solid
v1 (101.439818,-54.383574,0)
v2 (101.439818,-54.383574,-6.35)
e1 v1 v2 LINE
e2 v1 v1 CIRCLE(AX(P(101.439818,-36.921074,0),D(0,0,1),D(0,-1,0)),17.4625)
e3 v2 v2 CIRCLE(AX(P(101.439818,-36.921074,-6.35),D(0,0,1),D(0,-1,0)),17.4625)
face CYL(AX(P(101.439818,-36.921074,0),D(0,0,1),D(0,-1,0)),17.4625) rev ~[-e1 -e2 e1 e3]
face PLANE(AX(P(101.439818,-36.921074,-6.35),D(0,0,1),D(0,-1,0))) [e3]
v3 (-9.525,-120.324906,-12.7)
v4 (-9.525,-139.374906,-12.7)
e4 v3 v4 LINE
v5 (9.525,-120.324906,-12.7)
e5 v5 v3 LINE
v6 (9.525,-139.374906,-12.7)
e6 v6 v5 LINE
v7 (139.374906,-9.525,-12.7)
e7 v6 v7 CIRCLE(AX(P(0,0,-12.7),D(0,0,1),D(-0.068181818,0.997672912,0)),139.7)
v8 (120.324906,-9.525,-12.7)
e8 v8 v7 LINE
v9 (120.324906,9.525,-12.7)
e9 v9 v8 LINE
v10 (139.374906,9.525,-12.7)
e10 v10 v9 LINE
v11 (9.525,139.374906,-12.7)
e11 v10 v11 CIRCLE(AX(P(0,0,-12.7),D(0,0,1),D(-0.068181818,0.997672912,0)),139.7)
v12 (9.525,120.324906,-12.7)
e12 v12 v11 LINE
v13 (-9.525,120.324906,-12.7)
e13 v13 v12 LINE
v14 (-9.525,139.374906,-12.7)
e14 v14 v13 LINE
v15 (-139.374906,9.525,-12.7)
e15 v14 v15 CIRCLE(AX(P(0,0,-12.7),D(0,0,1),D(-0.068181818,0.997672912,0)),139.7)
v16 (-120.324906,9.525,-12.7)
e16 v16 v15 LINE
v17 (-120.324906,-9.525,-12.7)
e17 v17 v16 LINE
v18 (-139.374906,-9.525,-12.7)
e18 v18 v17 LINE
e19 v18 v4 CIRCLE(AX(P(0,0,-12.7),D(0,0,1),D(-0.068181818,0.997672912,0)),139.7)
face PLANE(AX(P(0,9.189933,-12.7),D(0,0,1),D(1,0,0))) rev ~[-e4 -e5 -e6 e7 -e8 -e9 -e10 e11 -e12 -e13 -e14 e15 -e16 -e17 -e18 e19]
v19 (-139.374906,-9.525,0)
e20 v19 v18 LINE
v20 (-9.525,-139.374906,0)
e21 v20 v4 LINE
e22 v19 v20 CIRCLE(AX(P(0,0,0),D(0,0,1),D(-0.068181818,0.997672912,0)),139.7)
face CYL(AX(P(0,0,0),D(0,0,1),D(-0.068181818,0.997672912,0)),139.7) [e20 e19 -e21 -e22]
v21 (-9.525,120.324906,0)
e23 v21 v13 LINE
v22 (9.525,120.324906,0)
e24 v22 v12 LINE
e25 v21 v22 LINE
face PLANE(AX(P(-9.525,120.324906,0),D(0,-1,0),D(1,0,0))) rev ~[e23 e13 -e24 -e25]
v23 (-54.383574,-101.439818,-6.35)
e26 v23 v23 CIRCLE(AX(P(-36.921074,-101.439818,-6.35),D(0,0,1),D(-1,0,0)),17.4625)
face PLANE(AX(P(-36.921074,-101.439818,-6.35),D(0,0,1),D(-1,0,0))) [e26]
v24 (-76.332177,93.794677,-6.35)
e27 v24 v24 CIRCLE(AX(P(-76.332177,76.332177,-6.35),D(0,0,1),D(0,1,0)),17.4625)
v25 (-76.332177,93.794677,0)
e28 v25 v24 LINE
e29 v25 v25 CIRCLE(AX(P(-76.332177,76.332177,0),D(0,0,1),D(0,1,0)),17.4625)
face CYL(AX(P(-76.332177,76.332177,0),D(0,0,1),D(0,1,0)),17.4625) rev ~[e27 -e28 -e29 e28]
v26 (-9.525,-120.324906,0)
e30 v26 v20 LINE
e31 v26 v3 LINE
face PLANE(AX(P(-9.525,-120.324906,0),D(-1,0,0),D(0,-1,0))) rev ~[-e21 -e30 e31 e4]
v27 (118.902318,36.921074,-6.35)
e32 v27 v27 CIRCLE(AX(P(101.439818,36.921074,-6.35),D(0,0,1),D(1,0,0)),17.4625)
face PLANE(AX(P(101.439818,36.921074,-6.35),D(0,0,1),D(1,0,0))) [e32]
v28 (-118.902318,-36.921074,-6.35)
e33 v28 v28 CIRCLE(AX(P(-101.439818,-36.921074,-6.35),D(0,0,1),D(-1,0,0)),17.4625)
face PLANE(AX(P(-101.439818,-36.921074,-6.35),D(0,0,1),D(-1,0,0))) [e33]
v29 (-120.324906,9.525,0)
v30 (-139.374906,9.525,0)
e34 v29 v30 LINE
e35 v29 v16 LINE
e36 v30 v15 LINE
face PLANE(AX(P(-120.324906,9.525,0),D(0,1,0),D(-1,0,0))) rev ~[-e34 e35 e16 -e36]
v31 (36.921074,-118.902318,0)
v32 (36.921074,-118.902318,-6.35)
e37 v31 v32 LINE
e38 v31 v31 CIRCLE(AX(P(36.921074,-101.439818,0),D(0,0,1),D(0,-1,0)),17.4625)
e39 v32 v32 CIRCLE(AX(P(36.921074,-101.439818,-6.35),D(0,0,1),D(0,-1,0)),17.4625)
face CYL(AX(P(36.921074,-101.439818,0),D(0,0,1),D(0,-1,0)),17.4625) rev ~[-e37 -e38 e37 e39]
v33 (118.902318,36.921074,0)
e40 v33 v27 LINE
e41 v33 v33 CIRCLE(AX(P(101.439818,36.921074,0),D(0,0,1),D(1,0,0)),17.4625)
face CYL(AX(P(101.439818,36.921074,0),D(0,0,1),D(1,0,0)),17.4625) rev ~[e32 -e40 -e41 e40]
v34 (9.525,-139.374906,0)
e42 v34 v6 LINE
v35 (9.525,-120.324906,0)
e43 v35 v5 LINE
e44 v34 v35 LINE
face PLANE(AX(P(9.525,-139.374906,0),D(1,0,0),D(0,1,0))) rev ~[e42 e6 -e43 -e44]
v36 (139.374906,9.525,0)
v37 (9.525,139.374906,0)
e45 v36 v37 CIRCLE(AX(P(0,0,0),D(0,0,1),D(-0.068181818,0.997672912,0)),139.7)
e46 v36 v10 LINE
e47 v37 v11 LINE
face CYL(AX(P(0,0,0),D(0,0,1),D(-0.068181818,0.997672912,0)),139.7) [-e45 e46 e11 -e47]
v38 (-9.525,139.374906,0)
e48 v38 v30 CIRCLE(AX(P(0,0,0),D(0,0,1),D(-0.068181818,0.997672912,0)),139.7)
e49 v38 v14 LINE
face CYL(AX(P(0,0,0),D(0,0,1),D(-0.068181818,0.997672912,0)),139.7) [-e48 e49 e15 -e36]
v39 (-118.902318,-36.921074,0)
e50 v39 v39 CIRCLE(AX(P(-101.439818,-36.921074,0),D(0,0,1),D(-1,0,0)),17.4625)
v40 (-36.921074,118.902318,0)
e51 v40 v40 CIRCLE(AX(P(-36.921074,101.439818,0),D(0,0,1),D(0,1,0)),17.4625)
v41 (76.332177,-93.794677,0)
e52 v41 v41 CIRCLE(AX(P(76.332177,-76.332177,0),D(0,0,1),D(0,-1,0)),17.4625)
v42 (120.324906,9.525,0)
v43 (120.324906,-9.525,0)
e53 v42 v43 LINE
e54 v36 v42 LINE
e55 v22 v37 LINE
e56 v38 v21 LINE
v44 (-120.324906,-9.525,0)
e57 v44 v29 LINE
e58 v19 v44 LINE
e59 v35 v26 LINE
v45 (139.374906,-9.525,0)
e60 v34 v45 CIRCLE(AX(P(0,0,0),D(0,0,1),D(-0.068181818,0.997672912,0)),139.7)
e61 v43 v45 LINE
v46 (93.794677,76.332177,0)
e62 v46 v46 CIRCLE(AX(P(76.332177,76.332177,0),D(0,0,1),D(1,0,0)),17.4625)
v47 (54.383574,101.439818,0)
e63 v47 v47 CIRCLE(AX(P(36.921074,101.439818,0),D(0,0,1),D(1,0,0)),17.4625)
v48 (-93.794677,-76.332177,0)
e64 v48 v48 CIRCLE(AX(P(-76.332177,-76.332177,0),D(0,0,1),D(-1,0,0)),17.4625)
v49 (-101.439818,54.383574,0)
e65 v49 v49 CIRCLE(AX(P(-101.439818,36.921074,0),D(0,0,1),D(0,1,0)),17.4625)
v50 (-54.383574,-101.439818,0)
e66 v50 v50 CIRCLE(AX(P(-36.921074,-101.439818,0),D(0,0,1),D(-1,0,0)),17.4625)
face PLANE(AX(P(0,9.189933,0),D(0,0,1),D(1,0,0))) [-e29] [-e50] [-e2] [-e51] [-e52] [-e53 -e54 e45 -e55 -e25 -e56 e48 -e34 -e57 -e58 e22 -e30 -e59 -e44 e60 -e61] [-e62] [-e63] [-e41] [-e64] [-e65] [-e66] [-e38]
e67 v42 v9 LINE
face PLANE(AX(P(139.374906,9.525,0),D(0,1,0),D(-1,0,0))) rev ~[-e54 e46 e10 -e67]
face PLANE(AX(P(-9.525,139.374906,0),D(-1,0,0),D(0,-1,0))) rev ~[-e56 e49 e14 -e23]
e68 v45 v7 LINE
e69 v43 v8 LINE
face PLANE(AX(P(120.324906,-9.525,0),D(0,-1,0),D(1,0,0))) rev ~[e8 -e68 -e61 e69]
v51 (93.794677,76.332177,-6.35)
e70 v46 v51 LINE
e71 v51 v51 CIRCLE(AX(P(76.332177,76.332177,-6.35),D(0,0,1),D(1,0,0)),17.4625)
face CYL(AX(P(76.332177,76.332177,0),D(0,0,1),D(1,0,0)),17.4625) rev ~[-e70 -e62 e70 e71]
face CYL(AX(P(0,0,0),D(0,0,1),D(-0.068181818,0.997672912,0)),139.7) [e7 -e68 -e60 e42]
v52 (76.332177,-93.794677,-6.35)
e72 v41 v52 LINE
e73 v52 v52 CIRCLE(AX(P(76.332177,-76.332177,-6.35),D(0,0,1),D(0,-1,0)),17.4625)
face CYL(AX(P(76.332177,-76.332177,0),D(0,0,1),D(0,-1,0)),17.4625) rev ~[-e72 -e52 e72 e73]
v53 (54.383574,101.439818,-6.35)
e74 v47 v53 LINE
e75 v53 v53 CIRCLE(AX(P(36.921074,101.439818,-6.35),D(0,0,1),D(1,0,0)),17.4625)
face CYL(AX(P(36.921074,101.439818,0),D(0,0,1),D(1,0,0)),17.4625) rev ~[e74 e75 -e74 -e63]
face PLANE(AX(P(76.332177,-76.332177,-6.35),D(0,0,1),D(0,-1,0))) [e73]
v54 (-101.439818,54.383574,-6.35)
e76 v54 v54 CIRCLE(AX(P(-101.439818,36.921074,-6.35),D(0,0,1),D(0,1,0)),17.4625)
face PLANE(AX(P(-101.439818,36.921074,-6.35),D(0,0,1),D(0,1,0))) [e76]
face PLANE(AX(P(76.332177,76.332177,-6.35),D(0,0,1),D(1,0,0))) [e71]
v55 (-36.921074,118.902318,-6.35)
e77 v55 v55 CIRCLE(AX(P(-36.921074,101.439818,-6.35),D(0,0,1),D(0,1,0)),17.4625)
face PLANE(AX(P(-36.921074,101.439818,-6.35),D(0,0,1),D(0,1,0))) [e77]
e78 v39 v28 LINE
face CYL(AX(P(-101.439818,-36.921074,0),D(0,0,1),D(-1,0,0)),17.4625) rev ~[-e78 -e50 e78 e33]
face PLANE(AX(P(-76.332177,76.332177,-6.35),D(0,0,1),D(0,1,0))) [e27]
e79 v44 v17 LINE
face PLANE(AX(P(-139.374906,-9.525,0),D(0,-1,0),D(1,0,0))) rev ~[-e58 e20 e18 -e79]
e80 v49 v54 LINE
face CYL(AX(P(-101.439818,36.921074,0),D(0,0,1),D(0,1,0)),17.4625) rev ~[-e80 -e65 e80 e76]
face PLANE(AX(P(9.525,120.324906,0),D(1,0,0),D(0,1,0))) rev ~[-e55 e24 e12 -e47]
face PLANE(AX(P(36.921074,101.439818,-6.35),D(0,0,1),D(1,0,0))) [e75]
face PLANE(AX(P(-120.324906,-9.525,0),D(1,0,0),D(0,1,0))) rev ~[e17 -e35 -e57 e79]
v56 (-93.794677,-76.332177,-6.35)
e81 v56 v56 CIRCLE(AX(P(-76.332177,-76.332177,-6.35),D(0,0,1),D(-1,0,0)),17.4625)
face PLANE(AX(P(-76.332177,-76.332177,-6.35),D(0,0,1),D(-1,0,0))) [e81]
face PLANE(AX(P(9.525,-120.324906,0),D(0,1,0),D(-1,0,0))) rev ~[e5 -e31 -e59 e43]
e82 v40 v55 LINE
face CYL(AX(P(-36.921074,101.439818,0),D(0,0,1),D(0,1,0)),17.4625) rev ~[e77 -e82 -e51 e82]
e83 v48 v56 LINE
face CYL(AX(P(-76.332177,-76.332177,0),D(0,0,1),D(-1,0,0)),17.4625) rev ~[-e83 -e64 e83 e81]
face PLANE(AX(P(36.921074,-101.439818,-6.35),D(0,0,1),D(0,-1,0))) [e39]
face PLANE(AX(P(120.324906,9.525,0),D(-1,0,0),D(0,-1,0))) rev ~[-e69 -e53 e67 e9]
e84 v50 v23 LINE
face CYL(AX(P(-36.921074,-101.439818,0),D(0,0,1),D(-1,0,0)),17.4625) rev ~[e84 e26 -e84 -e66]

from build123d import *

# Parameters (mm, degrees)
F0_R            = 44.8437
F0_R_2          = 17.4625
F0_W            = 19.05
F0_H            = 6.35
F1_DEPTH        = 12.7
F2_DEPTH        = 6.35
F2_COPIES_COUNT = 4
F3_DEPTH        = 12.701
F3_COPIES_COUNT = 4


# Not quite as in the source:
# - a pattern or mirror of a feature is missing from the dataset's text; its kind, count and spacing are read off the source's solid


with BuildPart() as f1:
    # F0 (on Top) → F1 (new body)
    with BuildSketch(Plane.XY):
        with BuildLine():
            ThreePointArc((-9.525, 139.3749058296), (-95.3557746023, -102.0948884617), (139.7, 0))
            ThreePointArc((139.7, 0), (102.0948884617, 95.3557746023), (9.525, 139.3749058296))
            Line((9.525, 139.3749058296), (9.525, 120.3249058296))
            Line((9.525, 120.3249058296), (9.525, 113.9749058296))
            Line((9.525, 113.9749058296), (-9.525, 113.9749058296))
            Line((-9.525, 113.9749058296), (-9.525, 120.3249058296))
            Line((-9.525, 120.3249058296), (-9.525, 139.3749058296))
        make_face()
        Circle(F0_R, mode=Mode.SUBTRACT)
        with Locations((101.4398184138, 36.921074472)):
            Circle(F0_R_2, mode=Mode.SUBTRACT)
        with Locations((36.921074472, 101.4398184138)):
            Circle(F0_R_2, mode=Mode.SUBTRACT)
        with Locations((76.3321770291, 76.3321770291)):
            Circle(F0_R_2, mode=Mode.SUBTRACT)
        with BuildLine():
            Line((9.525, 120.3249058296), (9.525, 139.3749058296))
            ThreePointArc((9.525, 139.3749058296), (0, 139.7), (-9.525, 139.3749058296))
            Line((-9.525, 139.3749058296), (-9.525, 120.3249058296))
            Line((-9.525, 120.3249058296), (9.525, 120.3249058296))
        make_face()
        with Locations((36.921074472, 101.4398184138)):
            Circle(F0_R_2)
        with Locations((76.3321770291, 76.3321770291)):
            Circle(F0_R_2)
        with Locations((101.4398184138, 36.921074472)):
            Circle(F0_R_2)
        with Locations((0, 117.1499058296)):
            Rectangle(F0_W, F0_H)
        Circle(F0_R)
    extrude(amount=-F1_DEPTH)

    # F0 (on Top) → F2 (cut)
    with BuildSketch(Plane.XY):
        with Locations((36.921074472, 101.4398184138)):
            Circle(F0_R_2)
        with Locations((76.3321770291, 76.3321770291)):
            Circle(F0_R_2)
        with Locations((101.4398184138, 36.921074472)):
            Circle(F0_R_2)
    f2 = extrude(amount=-F2_DEPTH, mode=Mode.SUBTRACT)

    # F2_copies: F2 ×4 about axis
    f2_copies_axis = Axis((0, 0, 0), (0, 0, 1))
    for i in range(1, F2_COPIES_COUNT):
        add(f2.rotate(f2_copies_axis, i * 360 / F2_COPIES_COUNT), mode=Mode.SUBTRACT)

    # F0 (on Top) → F3 (cut, through all)
    with BuildSketch(Plane.XY):
        with BuildLine():
            Line((9.525, 120.3249058296), (9.525, 139.3749058296))
            ThreePointArc((9.525, 139.3749058296), (0, 139.7), (-9.525, 139.3749058296))
            Line((-9.525, 139.3749058296), (-9.525, 120.3249058296))
            Line((-9.525, 120.3249058296), (9.525, 120.3249058296))
        make_face()
    f3 = extrude(amount=-F3_DEPTH, mode=Mode.SUBTRACT)

    # F3_copies: F3 ×4 about axis
    f3_copies_axis = Axis((0, 0, 0), (0, 0, 1))
    for i in range(1, F3_COPIES_COUNT):
        add(f3.rotate(f3_copies_axis, i * 360 / F3_COPIES_COUNT), mode=Mode.SUBTRACT)


solid = f1.part
